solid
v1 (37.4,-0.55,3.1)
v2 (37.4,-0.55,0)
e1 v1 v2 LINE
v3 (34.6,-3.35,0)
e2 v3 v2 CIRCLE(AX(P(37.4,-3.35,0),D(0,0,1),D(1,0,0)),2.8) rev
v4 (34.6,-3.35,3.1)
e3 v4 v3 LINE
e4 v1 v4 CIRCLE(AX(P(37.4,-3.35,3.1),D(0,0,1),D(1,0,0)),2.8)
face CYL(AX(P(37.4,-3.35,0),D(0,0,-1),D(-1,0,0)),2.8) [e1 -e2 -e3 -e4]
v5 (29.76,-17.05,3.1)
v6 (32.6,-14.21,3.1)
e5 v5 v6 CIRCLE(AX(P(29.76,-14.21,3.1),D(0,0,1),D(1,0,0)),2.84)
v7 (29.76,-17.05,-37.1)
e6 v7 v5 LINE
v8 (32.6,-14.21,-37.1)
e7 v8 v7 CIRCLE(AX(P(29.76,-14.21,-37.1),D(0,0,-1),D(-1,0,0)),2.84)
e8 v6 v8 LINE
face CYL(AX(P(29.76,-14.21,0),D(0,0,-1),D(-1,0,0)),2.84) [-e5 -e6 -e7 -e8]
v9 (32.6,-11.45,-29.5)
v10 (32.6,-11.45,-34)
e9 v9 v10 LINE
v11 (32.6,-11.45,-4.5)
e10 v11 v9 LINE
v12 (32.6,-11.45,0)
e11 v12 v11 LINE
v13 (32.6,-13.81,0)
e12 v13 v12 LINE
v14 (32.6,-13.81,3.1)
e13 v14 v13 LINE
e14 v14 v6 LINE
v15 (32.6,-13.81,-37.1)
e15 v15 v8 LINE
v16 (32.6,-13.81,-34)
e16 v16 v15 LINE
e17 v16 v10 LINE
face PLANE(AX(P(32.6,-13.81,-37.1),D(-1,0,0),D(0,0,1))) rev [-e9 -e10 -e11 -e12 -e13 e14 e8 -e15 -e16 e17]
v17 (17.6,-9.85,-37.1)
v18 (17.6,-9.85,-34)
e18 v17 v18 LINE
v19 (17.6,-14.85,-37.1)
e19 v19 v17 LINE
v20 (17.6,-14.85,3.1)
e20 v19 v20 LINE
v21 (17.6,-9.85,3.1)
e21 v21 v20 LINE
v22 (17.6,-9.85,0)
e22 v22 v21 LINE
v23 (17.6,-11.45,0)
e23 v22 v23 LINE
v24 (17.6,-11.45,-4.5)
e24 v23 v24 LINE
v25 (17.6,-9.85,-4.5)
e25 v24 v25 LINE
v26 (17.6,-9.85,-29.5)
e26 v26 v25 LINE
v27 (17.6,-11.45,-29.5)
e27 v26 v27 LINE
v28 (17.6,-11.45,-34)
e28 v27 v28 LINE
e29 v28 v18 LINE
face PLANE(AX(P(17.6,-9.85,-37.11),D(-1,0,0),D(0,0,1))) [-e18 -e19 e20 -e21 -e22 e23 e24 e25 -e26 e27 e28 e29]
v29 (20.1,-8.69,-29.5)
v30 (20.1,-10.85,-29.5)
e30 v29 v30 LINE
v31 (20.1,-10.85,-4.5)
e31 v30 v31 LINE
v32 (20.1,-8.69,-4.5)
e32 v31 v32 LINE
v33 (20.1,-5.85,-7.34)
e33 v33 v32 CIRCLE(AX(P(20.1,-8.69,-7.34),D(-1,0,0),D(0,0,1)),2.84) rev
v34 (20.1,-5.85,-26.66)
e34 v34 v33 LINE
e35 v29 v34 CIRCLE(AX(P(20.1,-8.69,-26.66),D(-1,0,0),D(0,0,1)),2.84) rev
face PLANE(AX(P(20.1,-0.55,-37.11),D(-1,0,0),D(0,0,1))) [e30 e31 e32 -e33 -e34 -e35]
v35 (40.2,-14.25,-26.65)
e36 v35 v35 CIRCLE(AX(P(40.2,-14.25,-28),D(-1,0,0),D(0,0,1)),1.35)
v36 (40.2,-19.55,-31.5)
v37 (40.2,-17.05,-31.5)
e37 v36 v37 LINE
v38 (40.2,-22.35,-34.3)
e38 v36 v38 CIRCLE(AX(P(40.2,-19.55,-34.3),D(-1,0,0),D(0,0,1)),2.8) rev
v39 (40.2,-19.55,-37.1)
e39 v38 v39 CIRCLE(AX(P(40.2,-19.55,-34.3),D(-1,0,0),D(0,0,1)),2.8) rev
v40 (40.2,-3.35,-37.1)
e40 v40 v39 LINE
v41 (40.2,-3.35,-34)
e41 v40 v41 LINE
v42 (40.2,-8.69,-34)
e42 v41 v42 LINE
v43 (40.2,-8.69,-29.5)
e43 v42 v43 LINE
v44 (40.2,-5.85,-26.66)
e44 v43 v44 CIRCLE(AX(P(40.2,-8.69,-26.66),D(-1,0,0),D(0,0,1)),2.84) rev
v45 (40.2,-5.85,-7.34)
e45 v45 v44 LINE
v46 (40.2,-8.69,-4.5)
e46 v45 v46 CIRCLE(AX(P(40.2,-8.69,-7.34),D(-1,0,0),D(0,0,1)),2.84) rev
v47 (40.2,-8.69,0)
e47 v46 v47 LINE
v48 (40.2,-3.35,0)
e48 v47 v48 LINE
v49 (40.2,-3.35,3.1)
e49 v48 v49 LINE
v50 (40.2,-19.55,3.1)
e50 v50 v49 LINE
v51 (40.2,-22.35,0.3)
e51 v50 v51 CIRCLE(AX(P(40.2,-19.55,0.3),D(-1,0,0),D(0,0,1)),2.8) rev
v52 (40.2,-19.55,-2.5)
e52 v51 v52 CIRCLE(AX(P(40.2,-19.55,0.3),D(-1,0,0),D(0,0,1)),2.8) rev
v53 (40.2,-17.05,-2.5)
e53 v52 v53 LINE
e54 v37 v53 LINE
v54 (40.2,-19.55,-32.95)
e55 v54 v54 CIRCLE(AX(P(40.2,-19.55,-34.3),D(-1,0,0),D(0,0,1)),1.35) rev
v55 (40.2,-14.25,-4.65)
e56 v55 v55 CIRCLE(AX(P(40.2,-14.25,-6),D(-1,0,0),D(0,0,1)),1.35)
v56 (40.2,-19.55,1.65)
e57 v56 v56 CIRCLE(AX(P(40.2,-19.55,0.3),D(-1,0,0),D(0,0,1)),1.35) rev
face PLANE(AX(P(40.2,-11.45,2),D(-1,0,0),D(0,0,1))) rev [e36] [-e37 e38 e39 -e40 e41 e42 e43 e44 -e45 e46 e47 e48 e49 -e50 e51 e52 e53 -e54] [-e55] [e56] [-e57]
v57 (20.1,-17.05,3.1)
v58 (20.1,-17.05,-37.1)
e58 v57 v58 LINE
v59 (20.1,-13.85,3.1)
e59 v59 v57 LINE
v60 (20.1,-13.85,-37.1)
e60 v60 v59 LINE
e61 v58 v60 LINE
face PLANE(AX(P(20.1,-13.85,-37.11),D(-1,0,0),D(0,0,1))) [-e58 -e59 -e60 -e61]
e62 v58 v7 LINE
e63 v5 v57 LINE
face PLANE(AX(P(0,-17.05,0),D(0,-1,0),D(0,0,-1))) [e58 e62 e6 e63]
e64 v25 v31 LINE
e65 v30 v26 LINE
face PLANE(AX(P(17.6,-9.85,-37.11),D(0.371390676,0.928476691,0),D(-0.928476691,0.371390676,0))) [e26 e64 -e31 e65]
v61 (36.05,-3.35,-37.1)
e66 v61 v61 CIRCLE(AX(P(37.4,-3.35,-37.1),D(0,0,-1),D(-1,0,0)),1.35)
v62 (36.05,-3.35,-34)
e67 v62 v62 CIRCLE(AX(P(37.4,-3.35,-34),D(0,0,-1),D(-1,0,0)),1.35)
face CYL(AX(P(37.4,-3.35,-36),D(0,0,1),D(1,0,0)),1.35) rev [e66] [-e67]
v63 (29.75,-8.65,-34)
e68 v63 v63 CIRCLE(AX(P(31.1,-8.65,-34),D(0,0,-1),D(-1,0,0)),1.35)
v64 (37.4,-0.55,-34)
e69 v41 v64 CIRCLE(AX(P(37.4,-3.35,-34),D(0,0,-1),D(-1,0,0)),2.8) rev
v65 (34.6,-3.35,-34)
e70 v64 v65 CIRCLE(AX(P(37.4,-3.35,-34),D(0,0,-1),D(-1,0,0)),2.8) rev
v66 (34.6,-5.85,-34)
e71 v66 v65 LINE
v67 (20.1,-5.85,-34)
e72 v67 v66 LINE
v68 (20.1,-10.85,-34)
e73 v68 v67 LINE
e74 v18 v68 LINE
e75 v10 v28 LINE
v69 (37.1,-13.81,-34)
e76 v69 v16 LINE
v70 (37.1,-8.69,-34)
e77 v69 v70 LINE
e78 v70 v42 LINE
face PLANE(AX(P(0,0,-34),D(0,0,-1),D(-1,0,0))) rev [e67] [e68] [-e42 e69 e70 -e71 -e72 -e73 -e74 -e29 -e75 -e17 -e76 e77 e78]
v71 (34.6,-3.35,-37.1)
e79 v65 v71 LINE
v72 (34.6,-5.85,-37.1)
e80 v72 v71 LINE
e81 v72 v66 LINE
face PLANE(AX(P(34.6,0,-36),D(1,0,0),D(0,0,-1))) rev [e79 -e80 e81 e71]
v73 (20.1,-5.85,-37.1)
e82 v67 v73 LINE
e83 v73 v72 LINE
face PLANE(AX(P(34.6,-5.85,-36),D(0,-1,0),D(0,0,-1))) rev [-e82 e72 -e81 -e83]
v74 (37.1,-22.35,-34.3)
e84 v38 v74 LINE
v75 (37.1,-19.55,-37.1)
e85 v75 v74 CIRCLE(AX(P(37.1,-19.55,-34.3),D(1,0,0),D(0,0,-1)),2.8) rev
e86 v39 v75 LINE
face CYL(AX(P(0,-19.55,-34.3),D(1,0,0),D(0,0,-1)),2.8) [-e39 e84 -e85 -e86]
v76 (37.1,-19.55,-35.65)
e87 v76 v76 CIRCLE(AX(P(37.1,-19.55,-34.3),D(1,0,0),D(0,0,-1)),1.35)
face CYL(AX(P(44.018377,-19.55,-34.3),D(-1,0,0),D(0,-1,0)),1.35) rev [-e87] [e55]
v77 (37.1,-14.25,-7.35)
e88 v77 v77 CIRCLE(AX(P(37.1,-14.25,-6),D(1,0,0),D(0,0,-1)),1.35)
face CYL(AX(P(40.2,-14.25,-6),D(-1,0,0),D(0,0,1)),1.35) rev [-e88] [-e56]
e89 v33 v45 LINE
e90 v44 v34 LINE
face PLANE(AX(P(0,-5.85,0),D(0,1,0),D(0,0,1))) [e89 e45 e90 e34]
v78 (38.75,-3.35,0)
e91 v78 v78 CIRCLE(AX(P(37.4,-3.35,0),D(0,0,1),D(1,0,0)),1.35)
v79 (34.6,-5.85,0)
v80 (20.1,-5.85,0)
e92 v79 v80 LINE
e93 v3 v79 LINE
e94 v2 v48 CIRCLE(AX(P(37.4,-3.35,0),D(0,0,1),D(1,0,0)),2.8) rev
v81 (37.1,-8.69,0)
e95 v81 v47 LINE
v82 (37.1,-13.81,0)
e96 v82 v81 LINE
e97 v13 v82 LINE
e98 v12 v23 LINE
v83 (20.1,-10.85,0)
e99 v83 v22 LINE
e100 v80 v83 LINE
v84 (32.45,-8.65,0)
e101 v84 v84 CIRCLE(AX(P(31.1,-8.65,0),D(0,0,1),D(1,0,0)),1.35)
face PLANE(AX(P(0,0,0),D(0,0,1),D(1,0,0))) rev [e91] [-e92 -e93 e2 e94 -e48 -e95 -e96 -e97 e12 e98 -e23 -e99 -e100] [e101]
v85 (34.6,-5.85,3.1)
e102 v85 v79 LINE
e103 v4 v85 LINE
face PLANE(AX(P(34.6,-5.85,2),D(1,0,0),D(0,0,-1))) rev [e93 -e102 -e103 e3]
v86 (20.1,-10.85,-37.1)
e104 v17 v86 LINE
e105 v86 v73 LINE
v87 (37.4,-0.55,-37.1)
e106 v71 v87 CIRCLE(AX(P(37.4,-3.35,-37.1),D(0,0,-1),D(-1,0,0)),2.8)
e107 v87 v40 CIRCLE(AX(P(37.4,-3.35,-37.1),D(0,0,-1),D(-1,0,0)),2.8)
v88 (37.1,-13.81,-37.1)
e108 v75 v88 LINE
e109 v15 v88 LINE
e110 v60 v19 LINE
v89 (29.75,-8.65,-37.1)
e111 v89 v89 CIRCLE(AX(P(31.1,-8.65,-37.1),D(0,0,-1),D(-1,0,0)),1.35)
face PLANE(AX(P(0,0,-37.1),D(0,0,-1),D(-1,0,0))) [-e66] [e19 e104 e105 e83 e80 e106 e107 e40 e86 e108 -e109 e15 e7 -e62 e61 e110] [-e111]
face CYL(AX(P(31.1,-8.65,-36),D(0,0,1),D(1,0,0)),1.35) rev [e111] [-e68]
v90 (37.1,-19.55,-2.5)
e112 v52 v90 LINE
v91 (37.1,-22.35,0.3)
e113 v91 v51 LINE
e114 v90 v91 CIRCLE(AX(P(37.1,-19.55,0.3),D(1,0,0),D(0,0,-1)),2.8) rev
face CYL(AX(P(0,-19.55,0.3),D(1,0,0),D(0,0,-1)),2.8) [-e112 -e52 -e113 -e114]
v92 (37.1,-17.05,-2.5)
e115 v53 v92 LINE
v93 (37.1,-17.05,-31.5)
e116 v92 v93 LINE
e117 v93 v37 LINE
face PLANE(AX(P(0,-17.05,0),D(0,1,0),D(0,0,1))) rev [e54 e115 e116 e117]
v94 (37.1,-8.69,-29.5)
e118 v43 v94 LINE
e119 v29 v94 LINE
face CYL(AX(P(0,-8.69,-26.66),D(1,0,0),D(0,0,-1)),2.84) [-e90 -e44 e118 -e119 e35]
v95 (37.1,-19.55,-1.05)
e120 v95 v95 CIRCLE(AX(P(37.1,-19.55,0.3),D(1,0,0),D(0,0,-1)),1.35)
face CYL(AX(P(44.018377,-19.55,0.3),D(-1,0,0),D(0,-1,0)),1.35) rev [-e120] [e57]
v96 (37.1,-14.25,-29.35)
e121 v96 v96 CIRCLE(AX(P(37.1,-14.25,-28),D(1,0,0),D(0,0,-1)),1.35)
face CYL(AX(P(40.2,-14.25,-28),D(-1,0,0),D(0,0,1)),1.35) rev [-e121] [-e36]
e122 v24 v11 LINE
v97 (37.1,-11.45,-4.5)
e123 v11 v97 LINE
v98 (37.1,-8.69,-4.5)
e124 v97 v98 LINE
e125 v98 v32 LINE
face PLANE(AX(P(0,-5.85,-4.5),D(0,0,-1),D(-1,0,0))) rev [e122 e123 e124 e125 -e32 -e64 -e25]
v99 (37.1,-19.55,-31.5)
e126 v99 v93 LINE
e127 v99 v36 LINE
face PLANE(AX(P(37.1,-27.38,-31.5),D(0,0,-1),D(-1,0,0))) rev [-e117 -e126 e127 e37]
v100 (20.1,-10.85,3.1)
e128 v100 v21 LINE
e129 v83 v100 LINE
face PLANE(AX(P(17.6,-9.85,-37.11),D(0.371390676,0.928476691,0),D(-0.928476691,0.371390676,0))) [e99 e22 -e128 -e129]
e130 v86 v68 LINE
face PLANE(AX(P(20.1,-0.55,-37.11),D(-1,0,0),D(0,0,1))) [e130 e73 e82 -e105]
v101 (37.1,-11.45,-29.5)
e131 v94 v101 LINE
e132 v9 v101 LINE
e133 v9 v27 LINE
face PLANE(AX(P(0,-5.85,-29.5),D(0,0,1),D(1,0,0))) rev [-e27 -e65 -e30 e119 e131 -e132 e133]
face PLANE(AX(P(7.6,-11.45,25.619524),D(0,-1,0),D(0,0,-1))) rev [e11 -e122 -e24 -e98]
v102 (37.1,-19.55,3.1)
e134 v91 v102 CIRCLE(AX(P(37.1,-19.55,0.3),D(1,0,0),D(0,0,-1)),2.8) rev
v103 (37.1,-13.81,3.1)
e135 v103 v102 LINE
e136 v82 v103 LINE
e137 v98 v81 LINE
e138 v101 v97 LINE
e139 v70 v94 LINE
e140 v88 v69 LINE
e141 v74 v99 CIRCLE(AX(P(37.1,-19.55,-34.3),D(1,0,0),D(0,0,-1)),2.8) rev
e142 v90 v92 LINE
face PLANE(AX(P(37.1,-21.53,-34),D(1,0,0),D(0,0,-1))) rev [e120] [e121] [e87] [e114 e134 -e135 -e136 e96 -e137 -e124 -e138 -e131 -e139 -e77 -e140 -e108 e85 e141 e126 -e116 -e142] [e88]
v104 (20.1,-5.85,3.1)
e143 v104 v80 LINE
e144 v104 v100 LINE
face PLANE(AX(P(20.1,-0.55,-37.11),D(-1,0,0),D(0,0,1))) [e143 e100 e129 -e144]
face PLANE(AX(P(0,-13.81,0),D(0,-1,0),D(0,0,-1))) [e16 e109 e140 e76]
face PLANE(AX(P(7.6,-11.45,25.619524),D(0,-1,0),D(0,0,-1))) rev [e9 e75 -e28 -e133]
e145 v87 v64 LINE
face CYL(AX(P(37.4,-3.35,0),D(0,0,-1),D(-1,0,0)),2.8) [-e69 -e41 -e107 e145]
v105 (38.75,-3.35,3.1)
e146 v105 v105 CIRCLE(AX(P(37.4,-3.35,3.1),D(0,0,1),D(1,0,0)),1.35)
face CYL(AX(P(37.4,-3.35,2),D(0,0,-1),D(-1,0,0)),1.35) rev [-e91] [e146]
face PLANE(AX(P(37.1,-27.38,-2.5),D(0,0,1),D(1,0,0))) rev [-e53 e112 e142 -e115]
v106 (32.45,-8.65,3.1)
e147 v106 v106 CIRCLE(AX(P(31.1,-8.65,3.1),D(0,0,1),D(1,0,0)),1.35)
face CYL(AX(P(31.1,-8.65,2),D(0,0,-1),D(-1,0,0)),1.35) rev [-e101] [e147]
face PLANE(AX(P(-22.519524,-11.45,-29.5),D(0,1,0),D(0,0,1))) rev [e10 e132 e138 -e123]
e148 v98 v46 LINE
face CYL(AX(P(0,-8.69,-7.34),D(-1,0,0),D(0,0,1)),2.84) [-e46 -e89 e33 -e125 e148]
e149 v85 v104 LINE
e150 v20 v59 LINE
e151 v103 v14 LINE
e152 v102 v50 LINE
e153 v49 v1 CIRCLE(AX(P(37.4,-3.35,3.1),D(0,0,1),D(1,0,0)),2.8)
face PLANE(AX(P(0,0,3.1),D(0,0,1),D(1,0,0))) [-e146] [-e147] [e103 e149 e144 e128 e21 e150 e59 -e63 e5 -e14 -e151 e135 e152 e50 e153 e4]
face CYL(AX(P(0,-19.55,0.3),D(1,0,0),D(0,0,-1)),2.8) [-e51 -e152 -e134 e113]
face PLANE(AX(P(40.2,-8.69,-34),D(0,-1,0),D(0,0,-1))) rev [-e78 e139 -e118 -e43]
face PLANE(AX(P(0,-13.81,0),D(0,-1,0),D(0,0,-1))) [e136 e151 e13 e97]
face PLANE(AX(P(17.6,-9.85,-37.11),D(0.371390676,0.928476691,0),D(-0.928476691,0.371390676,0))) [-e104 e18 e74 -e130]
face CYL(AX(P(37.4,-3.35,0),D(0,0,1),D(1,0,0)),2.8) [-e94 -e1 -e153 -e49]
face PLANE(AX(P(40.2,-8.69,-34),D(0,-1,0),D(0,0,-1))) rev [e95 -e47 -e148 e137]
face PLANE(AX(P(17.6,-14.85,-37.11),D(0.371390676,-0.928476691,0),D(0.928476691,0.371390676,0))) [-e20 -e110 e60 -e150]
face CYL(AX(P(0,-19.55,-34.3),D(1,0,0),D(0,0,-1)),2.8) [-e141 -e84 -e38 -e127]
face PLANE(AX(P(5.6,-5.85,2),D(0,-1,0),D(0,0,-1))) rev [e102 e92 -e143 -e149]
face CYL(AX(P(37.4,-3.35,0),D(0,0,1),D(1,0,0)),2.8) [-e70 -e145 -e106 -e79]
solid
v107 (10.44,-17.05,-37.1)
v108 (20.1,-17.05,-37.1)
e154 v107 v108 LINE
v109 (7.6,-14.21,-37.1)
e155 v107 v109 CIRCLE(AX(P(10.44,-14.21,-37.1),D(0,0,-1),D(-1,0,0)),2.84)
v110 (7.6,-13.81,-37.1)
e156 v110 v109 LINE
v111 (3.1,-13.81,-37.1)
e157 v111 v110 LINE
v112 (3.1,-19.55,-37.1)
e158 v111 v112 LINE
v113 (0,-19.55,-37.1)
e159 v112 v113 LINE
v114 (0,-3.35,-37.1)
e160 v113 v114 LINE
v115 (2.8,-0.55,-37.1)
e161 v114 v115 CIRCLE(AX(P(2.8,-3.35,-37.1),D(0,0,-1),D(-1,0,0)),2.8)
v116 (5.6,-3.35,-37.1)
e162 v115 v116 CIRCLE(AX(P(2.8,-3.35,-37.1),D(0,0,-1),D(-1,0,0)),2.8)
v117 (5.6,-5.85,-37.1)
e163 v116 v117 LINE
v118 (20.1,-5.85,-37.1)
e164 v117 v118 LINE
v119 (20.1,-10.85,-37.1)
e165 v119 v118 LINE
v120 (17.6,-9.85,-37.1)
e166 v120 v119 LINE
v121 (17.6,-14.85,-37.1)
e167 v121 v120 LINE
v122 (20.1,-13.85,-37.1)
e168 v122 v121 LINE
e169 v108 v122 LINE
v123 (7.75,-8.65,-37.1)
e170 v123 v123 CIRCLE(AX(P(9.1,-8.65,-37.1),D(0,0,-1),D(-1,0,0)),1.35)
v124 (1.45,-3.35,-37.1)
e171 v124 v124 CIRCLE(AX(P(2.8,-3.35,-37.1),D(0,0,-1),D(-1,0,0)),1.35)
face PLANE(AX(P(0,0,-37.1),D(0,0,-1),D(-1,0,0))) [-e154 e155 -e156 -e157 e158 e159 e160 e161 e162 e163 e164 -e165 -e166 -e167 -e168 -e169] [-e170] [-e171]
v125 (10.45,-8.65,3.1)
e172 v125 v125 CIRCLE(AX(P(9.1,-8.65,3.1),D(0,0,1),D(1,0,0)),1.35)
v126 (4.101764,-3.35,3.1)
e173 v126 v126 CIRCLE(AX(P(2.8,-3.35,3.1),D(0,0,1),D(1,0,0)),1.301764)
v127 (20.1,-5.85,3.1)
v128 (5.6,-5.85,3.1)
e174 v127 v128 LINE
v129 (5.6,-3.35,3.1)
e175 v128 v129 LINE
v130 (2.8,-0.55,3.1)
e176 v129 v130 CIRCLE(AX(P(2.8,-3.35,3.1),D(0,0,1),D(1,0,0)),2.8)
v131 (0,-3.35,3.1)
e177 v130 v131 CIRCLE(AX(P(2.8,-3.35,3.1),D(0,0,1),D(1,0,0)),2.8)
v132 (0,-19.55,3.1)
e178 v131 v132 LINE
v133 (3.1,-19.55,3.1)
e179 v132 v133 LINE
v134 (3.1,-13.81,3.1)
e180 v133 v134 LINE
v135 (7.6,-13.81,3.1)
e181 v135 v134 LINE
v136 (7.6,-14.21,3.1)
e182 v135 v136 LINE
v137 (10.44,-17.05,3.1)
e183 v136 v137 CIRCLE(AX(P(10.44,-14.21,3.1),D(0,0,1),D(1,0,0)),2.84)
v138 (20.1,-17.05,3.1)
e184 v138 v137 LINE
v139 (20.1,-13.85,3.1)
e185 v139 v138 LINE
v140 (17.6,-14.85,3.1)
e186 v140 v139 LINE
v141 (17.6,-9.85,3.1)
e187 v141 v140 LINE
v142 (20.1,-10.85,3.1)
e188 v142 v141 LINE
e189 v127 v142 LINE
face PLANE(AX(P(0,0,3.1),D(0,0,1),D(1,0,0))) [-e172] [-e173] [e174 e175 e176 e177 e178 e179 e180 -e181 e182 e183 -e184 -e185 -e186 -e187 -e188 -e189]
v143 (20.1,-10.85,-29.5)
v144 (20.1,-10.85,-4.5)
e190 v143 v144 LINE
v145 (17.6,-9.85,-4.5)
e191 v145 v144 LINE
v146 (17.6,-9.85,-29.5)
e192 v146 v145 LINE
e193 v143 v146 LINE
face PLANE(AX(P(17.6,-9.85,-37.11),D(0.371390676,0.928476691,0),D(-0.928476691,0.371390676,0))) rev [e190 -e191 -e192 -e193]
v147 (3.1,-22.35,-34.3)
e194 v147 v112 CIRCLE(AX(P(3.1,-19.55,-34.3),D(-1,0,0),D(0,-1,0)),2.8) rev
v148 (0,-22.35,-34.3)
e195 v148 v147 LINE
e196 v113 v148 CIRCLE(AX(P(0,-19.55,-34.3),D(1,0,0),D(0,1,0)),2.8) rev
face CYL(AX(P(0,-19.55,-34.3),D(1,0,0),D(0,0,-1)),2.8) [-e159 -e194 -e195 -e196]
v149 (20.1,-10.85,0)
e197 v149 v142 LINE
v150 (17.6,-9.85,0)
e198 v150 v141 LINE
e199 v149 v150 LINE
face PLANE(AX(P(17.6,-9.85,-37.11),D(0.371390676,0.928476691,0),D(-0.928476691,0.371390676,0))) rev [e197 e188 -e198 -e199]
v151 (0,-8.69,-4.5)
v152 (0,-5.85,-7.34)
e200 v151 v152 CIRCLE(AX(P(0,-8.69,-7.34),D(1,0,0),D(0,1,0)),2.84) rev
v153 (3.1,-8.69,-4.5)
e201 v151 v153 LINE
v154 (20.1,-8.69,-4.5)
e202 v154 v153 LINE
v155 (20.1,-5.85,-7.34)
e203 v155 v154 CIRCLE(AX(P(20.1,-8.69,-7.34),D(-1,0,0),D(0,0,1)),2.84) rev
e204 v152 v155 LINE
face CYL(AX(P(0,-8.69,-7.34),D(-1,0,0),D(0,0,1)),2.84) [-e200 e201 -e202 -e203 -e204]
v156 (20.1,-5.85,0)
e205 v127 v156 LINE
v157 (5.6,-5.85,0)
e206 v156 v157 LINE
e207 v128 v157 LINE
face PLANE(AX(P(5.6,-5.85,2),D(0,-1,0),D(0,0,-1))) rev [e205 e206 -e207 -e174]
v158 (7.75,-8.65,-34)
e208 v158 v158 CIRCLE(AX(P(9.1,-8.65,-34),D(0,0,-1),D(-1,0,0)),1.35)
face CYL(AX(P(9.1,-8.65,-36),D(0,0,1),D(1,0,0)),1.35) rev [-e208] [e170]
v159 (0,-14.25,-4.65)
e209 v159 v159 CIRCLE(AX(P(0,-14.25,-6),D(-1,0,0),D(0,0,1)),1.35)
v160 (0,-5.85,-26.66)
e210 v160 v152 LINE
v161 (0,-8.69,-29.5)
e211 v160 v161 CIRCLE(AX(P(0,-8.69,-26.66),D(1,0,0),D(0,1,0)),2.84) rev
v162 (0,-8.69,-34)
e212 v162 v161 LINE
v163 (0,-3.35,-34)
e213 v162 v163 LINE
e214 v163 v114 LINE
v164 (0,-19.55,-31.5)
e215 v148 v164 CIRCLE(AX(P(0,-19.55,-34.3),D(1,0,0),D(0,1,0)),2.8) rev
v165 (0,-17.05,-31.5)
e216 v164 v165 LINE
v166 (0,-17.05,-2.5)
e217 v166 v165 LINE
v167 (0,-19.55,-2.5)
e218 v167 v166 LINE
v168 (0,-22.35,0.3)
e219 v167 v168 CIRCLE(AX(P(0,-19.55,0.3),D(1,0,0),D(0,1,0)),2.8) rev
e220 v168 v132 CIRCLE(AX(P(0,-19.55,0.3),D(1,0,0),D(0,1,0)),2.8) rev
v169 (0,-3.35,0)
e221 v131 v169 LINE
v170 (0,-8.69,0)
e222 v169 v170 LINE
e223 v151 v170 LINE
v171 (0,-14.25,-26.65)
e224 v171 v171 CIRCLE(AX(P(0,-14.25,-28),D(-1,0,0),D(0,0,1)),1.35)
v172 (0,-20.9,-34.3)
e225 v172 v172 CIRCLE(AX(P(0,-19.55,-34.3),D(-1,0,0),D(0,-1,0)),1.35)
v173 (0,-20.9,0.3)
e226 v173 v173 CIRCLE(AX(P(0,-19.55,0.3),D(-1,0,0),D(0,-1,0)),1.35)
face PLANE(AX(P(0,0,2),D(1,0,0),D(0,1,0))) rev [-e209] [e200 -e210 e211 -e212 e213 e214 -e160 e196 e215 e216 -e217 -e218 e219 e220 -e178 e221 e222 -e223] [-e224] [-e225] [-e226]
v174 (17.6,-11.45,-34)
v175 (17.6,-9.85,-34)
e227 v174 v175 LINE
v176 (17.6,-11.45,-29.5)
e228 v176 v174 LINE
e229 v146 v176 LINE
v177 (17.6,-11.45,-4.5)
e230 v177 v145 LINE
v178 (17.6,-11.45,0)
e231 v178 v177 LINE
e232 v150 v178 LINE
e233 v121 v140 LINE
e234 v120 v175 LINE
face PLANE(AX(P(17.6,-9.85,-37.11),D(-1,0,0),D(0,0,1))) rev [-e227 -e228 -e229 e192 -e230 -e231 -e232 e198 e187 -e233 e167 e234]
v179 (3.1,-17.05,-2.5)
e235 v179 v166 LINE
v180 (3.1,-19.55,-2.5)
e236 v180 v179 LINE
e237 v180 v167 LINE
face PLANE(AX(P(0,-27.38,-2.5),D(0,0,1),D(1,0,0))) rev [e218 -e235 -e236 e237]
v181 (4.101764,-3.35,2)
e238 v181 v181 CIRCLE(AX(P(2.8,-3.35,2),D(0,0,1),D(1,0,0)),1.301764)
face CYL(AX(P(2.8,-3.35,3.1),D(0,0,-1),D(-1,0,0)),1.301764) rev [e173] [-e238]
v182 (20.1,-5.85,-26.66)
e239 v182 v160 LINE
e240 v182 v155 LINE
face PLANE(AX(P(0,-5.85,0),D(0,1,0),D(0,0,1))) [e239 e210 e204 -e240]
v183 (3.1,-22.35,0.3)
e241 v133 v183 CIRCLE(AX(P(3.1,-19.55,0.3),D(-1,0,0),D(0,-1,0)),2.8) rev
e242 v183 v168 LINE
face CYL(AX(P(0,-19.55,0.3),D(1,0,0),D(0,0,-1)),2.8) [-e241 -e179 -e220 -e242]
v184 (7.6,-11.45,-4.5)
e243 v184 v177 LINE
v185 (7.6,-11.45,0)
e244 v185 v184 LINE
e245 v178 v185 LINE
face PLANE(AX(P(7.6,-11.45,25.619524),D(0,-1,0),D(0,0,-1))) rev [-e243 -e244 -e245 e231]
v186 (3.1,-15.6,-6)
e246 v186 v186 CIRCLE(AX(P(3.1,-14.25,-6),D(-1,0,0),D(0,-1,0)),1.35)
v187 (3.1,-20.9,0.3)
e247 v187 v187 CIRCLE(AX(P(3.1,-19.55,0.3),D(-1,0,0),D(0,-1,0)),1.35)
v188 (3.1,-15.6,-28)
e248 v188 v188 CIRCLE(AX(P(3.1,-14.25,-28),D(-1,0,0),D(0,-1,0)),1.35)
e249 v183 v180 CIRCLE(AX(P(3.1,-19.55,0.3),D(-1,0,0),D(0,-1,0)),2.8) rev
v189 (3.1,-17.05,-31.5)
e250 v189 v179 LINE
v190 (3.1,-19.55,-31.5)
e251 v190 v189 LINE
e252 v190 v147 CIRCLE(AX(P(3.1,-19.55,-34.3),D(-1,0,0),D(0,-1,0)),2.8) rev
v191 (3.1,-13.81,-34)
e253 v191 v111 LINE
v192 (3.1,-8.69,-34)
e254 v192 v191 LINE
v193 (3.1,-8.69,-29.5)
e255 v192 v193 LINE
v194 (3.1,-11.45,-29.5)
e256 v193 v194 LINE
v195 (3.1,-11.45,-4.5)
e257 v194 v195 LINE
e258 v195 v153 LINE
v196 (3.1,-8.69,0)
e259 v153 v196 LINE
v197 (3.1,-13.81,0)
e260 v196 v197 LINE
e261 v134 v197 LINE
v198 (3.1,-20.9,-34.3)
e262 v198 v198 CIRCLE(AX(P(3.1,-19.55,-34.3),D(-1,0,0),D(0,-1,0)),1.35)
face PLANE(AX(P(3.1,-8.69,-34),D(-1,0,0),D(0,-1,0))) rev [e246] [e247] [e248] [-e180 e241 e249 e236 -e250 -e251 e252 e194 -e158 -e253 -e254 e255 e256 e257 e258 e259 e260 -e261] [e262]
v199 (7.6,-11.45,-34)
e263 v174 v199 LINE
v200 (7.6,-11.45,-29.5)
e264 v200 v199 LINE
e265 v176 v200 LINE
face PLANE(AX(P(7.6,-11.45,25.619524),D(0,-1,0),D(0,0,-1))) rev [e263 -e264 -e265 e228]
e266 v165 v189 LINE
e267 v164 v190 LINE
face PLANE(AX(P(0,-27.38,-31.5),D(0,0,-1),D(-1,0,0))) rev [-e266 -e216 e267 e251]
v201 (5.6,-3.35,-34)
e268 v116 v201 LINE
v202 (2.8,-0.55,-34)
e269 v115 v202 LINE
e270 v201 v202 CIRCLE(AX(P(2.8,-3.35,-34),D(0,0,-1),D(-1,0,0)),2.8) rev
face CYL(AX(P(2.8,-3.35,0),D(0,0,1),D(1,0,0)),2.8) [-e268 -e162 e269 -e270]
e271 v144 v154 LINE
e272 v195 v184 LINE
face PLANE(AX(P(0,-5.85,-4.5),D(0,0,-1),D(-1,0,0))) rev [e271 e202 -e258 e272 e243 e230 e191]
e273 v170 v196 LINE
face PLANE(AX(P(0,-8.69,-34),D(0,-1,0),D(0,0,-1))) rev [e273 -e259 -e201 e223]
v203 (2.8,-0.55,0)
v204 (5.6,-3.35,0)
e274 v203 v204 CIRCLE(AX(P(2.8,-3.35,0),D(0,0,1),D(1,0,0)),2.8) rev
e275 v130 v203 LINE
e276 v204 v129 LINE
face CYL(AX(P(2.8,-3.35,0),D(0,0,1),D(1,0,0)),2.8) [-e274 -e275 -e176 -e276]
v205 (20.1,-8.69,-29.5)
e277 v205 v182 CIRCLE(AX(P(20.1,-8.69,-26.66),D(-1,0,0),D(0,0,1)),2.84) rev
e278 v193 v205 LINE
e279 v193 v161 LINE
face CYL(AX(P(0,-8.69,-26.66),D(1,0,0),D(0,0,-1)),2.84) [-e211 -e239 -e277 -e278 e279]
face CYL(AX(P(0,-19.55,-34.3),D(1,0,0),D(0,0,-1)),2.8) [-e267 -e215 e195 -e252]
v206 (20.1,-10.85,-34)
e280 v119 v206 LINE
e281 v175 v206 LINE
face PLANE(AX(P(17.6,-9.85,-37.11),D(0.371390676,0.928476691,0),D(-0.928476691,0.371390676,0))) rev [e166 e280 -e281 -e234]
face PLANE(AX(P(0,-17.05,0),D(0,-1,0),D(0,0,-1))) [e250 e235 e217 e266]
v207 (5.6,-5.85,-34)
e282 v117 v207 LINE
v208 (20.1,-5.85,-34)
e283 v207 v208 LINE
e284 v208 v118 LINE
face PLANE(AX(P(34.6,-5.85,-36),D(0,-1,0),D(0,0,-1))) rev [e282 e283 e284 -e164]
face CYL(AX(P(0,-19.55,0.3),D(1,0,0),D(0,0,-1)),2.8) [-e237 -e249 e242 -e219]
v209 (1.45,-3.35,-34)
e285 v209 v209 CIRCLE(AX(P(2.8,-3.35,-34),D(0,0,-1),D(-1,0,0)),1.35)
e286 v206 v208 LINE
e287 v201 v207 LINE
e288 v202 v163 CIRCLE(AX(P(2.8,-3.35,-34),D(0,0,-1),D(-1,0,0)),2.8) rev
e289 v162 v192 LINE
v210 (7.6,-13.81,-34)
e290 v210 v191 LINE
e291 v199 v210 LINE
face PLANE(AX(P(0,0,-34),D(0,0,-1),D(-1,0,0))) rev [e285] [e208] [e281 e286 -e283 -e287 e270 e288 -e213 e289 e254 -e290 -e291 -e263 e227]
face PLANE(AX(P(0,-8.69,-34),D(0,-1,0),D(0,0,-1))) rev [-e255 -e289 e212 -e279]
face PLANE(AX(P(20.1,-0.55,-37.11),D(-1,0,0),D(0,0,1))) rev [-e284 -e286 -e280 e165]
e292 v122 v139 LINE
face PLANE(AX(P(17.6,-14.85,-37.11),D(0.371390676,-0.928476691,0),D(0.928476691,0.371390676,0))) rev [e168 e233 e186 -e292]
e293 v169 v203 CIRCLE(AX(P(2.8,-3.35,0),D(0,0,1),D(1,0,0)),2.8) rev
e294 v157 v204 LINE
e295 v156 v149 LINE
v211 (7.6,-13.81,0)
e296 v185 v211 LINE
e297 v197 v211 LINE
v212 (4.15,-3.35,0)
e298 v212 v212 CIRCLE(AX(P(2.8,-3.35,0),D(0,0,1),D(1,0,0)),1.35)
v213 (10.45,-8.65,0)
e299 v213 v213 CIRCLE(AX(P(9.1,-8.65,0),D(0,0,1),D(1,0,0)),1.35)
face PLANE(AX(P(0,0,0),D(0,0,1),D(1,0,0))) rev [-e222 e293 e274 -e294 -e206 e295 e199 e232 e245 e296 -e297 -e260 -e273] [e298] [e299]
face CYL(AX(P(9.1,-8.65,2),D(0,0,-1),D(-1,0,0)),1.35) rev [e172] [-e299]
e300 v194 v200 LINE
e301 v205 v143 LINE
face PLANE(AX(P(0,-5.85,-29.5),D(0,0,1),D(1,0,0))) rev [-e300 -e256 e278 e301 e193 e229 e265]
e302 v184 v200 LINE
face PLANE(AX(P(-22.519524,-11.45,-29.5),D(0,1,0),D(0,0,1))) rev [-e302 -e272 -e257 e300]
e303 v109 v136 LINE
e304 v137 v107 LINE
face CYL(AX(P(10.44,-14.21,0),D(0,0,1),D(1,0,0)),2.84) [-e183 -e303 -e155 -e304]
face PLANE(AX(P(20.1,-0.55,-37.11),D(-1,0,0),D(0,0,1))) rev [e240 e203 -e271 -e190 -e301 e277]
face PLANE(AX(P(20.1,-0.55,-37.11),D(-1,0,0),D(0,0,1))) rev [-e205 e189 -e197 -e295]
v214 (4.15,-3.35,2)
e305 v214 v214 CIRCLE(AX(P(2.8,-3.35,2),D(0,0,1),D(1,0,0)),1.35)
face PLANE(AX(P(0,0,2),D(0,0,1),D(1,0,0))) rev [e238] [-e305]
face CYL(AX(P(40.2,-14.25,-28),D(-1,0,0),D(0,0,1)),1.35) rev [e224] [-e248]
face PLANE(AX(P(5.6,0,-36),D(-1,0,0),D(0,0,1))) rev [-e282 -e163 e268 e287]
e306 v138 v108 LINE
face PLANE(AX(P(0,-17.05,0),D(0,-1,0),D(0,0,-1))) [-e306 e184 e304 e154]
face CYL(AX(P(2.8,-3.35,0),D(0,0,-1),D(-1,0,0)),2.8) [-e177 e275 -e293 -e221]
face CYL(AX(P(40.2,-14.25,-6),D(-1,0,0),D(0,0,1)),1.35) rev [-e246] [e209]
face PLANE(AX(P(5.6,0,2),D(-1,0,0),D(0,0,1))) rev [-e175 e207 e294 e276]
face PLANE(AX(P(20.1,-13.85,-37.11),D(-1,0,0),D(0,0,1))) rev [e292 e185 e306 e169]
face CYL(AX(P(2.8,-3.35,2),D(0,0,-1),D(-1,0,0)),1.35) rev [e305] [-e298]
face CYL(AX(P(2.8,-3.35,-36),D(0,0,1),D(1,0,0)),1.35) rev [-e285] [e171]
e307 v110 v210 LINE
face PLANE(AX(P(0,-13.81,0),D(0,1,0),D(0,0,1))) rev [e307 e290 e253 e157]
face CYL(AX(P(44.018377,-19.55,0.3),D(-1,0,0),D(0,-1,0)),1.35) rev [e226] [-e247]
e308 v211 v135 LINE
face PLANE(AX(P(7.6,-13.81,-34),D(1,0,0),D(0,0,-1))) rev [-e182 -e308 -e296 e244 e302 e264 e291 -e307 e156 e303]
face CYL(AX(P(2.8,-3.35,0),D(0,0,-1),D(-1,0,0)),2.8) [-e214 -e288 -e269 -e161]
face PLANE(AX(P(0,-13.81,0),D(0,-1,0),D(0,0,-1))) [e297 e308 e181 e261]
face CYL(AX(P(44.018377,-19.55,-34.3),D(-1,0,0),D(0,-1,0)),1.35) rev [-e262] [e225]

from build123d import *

# Parameters (mm, degrees)
ESBO_O1_R                  = 1.35
RESSALTO_EXTRUS_O1_DEPTH   = 2
ESBO_O3_W                  = 40.2
ESBO_O3_H                  = 2
RESSALTO_EXTRUS_O2_DEPTH   = 10.08
ESBO_O4_W                  = 3.1
ESBO_O4_H                  = 12.84
RESSALTO_EXTRUS_O3_DEPTH   = 34
CORTE_EXTRUS_O1_DEPTH      = 55.735280213
CORTE_EXTRUS_O1_DEPTH_BACK = 55.735280213
ESBO_O5_R                  = 1.35
ESBO_O7_W                  = 37.1
ESBO_O7_H                  = 3.24
CORTE_EXTRUS_O2_DEPTH      = 2
RESSALTO_EXTRUS_O5_START   = 2
ESBO_O12_R                 = 1.35
RESSALTO_EXTRUS_O5_DEPTH   = 2
ESBO_O18_W                 = 3.1
ESBO_O18_H                 = 3.24
RESSALTO_EXTRUS_O6_DEPTH   = 2
ESBO_O19_W                 = 3.1
ESBO_O19_H                 = 3.24
RESSALTO_EXTRUS_O7_DEPTH   = 2
ESBO_O21_R                 = 1.301764144
ESBO_O21_R_2               = 1.35
RESSALTO_EXTRUS_O8_DEPTH   = 1.1
RESSALTO_EXTRUS_O9_START   = 1.1
ESBO_O22_R                 = 1.35
RESSALTO_EXTRUS_O9_DEPTH   = 1.1
ESBO_O23_W                 = 3.1
ESBO_O23_H                 = 5.6
RESSALTO_EXTRUS_O10_DEPTH  = 5.85
CORTE_EXTRUS_O3_REACH      = 63.173
ESBO_O24_R                 = 1.35
ESBO_O25_W                 = 4.5
ESBO_O25_H                 = 3.1
CORTE_EXTRUS_O6_DEPTH      = 4.48
ESBO_O27_W                 = 3.1
ESBO_O27_H                 = 29
CORTE_EXTRUS_O7_DEPTH      = 4.48
ESBO_O28_W                 = 25
ESBO_O28_H                 = 40.2
CORTE_EXTRUS_O8_DEPTH      = 1.24
ESBO_O29_W                 = 25
ESBO_O29_H                 = 5.6
RESSALTO_EXTRUS_O11_DEPTH  = 34
ESBO_O31_W                 = 3.1
ESBO_O31_H                 = 25
RESSALTO_EXTRUS_O12_DEPTH  = 2.84
ESBO_O32_W                 = 25
ESBO_O32_H                 = 5.6
RESSALTO_EXTRUS_O13_DEPTH  = 34
FILETE1_R                  = 2.84
ESBO_O33_W                 = 5.6
ESBO_O33_H                 = 3.1
CORTE_EXTRUS_O9_DEPTH      = 0.55
ESBO_O35_W                 = 3.1
ESBO_O35_H                 = 5.6
CORTE_EXTRUS_O10_DEPTH     = 5.03
FILETE2_R                  = 2.8
DIVIDIR1_SURFACE_1_BACK    = 61.888
DIVIDIR1_SURFACE_1_DEPTH   = 123.776
DIVIDIR1_SURFACE_2_BACK    = 61.888
DIVIDIR1_SURFACE_2_DEPTH   = 123.776


with BuildPart() as part:
    # Esboço1 → Ressalto-extrusão1 (new body)
    with BuildSketch(Plane.XY):
        Polygon((0, 0), (5.6, 0), (5.6, -5.85), (34.6, -5.85), (34.6, 0), (40.2, 0), (40.2, -11.45), (0, -11.45), align=None)
        with Locations((2.8, -3.35)):
            Circle(ESBO_O1_R, mode=Mode.SUBTRACT)
        with Locations((37.4, -3.35)):
            Circle(ESBO_O1_R, mode=Mode.SUBTRACT)
        with Locations((31.1, -8.65)):
            Circle(ESBO_O1_R, mode=Mode.SUBTRACT)
        with Locations((9.1, -8.65)):
            Circle(ESBO_O1_R, mode=Mode.SUBTRACT)
    extrude(amount=RESSALTO_EXTRUS_O1_DEPTH)

    # Esboço3 → Ressalto-extrusão2 (add)
    with BuildSketch(Plane.XZ.offset(11.45)):
        with Locations((20.1, 1)):
            Rectangle(ESBO_O3_W, ESBO_O3_H)
    extrude(amount=RESSALTO_EXTRUS_O2_DEPTH)

    # Esboço4 → Ressalto-extrusão3 (add)
    with BuildSketch(Plane(origin=(0, 0, 0), x_dir=(-1, 0, 0), z_dir=(0, 0, -1))):
        with Locations((-38.65, -15.11)):
            Rectangle(ESBO_O4_W, ESBO_O4_H)
        with Locations((-1.55, -15.11)):
            Rectangle(ESBO_O4_W, ESBO_O4_H)
    extrude(amount=RESSALTO_EXTRUS_O3_DEPTH)

    # Esboço5 → Corte-extrusão1 (cut, two sides: drawn at the far end of the back side and taken through both)
    with BuildSketch(Plane.ZY.offset(-37.1).offset(-CORTE_EXTRUS_O1_DEPTH_BACK)):
        with Locations((-6, -14.25)):
            Circle(ESBO_O5_R)
        with Locations((-28, -14.25)):
            Circle(ESBO_O5_R)
    extrude(amount=CORTE_EXTRUS_O1_DEPTH + CORTE_EXTRUS_O1_DEPTH_BACK, mode=Mode.SUBTRACT)

    # Esboço7 → Corte-extrusão2 (cut)
    with BuildSketch(Plane(origin=(0, 0, 0), x_dir=(-1, 0, 0), z_dir=(0, 0, -1))):
        with Locations((-18.55, -19.91)):
            Rectangle(ESBO_O7_W, ESBO_O7_H)
    extrude(amount=-CORTE_EXTRUS_O2_DEPTH, mode=Mode.SUBTRACT)

    # Esboço12 → Ressalto-extrusão5 (add)
    with BuildSketch(Plane(origin=(0, 0, -34), x_dir=(-1, 0, 0), z_dir=(0, 0, -1)).offset(RESSALTO_EXTRUS_O5_START)):
        Polygon((-5.6, 0), (0, 0), (0, -18.29), (-40.2, -18.29), (-40.2, 0), (-34.6, 0), (-34.6, -5.85), (-5.6, -5.85), align=None)
        with Locations(Location((-31.1, -8.65, 0), (0, 0, 180))):
            Circle(ESBO_O12_R, mode=Mode.SUBTRACT)
        with Locations(Location((-9.1, -8.65, 0), (0, 0, 180))):
            Circle(ESBO_O12_R, mode=Mode.SUBTRACT)
        with Locations(Location((-2.8, -3.35, 0), (0, 0, 180))):
            Circle(ESBO_O12_R, mode=Mode.SUBTRACT)
        with Locations(Location((-37.4, -3.35, 0), (0, 0, 180))):
            Circle(ESBO_O12_R, mode=Mode.SUBTRACT)
    extrude(amount=-RESSALTO_EXTRUS_O5_DEPTH)

    # Esboço18 → Ressalto-extrusão6 (add)
    with BuildSketch(Plane.XY):
        with Locations((1.55, -19.91)):
            Rectangle(ESBO_O18_W, ESBO_O18_H)
    extrude(amount=RESSALTO_EXTRUS_O6_DEPTH)

    # Esboço19 → Ressalto-extrusão7 (add)
    with BuildSketch(Plane(origin=(0, 0, -34), x_dir=(-1, 0, 0), z_dir=(0, 0, -1))):
        with Locations((-1.55, -19.91)):
            Rectangle(ESBO_O19_W, ESBO_O19_H)
        with Locations((-38.65, -19.91)):
            Rectangle(ESBO_O19_W, ESBO_O19_H)
    extrude(amount=RESSALTO_EXTRUS_O7_DEPTH)

    # Esboço21 → Ressalto-extrusão8 (add)
    with BuildSketch(Plane.XY.offset(2)):
        Polygon((37.1, -21.53), (40.2, -21.53), (40.2, 0), (34.6, 0), (34.6, -5.85), (5.6, -5.85), (5.6, 0), (0, 0), (0, -21.53), (3.1, -21.53), (3.1, -18.29), (37.1, -18.29), align=None)
        with Locations((2.8, -3.35)):
            Circle(ESBO_O21_R, mode=Mode.SUBTRACT)
        with Locations((9.1, -8.65)):
            Circle(ESBO_O21_R_2, mode=Mode.SUBTRACT)
        with Locations((31.1, -8.65)):
            Circle(ESBO_O21_R_2, mode=Mode.SUBTRACT)
        with Locations((37.4, -3.35)):
            Circle(ESBO_O21_R_2, mode=Mode.SUBTRACT)
    extrude(amount=RESSALTO_EXTRUS_O8_DEPTH)

    # Esboço22 → Ressalto-extrusão9 (add)
    with BuildSketch(Plane(origin=(0, 0, -36), x_dir=(-1, 0, 0), z_dir=(0, 0, -1)).offset(RESSALTO_EXTRUS_O9_START)):
        Polygon((-5.6, 0), (0, 0), (0, -21.53), (-3.1, -21.53), (-3.1, -18.29), (-37.1, -18.29), (-37.1, -21.53), (-40.2, -21.53), (-40.2, 0), (-34.6, 0), (-34.6, -5.85), (-5.6, -5.85), align=None)
        with Locations(Location((-37.4, -3.35, 0), (0, 0, 180))):
            Circle(ESBO_O22_R, mode=Mode.SUBTRACT)
        with Locations(Location((-31.1, -8.65, 0), (0, 0, 180))):
            Circle(ESBO_O22_R, mode=Mode.SUBTRACT)
        with Locations(Location((-9.1, -8.65, 0), (0, 0, 180))):
            Circle(ESBO_O22_R, mode=Mode.SUBTRACT)
        with Locations(Location((-2.8, -3.35, 0), (0, 0, 180))):
            Circle(ESBO_O22_R, mode=Mode.SUBTRACT)
    extrude(amount=-RESSALTO_EXTRUS_O9_DEPTH)

    # Esboço23 → Ressalto-extrusão10 (add)
    with BuildSketch(Plane.XZ.offset(21.53)):
        with Locations((1.55, 0.3)):
            Rectangle(ESBO_O23_W, ESBO_O23_H)
        with Locations((1.55, -34.3)):
            Rectangle(ESBO_O23_W, ESBO_O23_H)
        with Locations((38.65, -34.3)):
            Rectangle(ESBO_O23_W, ESBO_O23_H)
        with Locations((38.65, 0.3)):
            Rectangle(ESBO_O23_W, ESBO_O23_H)
    extrude(amount=RESSALTO_EXTRUS_O10_DEPTH)

    # Corte-extrusão3: up to this face of the body (flat: up to its plane)
    corte_extrus_o3_end = Plane(part.part.faces().sort_by_distance((40.2, -15.177512698, -17))[0])
    # Esboço24 → Corte-extrusão3 (cut, up to the picked face)
    with BuildSketch(Plane.ZY, mode=Mode.PRIVATE) as corte_extrus_o3_sk1:
        with Locations(Location((-34.3, -19.55, 0), (0, 0, 270))):
            Circle(ESBO_O24_R)
    corte_extrus_o3_tool1 = split(extrude(corte_extrus_o3_sk1.sketch, amount=-CORTE_EXTRUS_O3_REACH, mode=Mode.PRIVATE), bisect_by=corte_extrus_o3_end, keep=Keep.BOTH, mode=Mode.PRIVATE)
    # Esboço24 → Corte-extrusão3 (cut, up to the picked face)
    with BuildSketch(Plane.ZY, mode=Mode.PRIVATE) as corte_extrus_o3_sk2:
        with Locations(Location((0.3, -19.55, 0), (0, 0, 270))):
            Circle(ESBO_O24_R)
    corte_extrus_o3_tool2 = split(extrude(corte_extrus_o3_sk2.sketch, amount=-CORTE_EXTRUS_O3_REACH, mode=Mode.PRIVATE), bisect_by=corte_extrus_o3_end, keep=Keep.BOTH, mode=Mode.PRIVATE)
    add(corte_extrus_o3_tool1.solids().sort_by(Axis((0, -19.55, -34.3), (1, 0, 0)))[0], mode=Mode.SUBTRACT)
    add(corte_extrus_o3_tool2.solids().sort_by(Axis((0, -19.55, 0.3), (1, 0, 0)))[0], mode=Mode.SUBTRACT)

    # Esboço25 → Corte-extrusão6 (cut)
    with BuildSketch(Plane.XZ.offset(18.29)):
        with Locations((5.35, -35.55)):
            Rectangle(ESBO_O25_W, ESBO_O25_H)
        with Locations((34.85, -35.55)):
            Rectangle(ESBO_O25_W, ESBO_O25_H)
        with Locations((34.85, 1.55)):
            Rectangle(ESBO_O25_W, ESBO_O25_H)
        with Locations((5.35, 1.55)):
            Rectangle(ESBO_O25_W, ESBO_O25_H)
    extrude(amount=-CORTE_EXTRUS_O6_DEPTH, mode=Mode.SUBTRACT)

    # Esboço27 → Corte-extrusão7 (cut)
    with BuildSketch(Plane.XZ.offset(21.53)):
        with Locations((1.55, -17)):
            Rectangle(ESBO_O27_W, ESBO_O27_H)
        with Locations((38.65, -17)):
            Rectangle(ESBO_O27_W, ESBO_O27_H)
    extrude(amount=-CORTE_EXTRUS_O7_DEPTH, mode=Mode.SUBTRACT)

    # Esboço28 → Corte-extrusão8 (cut)
    with BuildSketch(Plane.XZ.offset(18.29)):
        with Locations((20.1, -17)):
            Rectangle(ESBO_O28_W, ESBO_O28_H)
    extrude(amount=-CORTE_EXTRUS_O8_DEPTH, mode=Mode.SUBTRACT)

    # Esboço29 → Ressalto-extrusão11 (add)
    with BuildSketch(Plane.XY.offset(-34)):
        with Locations((20.1, -14.25)):
            Rectangle(ESBO_O29_W, ESBO_O29_H)
    extrude(amount=RESSALTO_EXTRUS_O11_DEPTH)

    # Esboço31 → Ressalto-extrusão12 (add)
    with BuildSketch(Plane(origin=(0, -8.69, 0), x_dir=(1, 0, 0), z_dir=(0, 1, 0))):
        with Locations((1.55, 17)):
            Rectangle(ESBO_O31_W, ESBO_O31_H)
        with Locations((38.65, 17)):
            Rectangle(ESBO_O31_W, ESBO_O31_H)
    extrude(amount=RESSALTO_EXTRUS_O12_DEPTH)

    # Esboço32 → Ressalto-extrusão13 (add)
    with BuildSketch(Plane.ZY.offset(-37.1)):
        with Locations((-17, -8.65)):
            Rectangle(ESBO_O32_W, ESBO_O32_H)
    extrude(amount=RESSALTO_EXTRUS_O13_DEPTH)

    # Filete1
    filete1_edges = [part.edges().sort_by_distance(p)[0] for p in [
        (32.6, -17.05, -17),
        (7.6, -17.05, -17),
        (20.1, -5.85, -29.5),
        (20.1, -5.85, -4.5),
    ]]
    fillet(filete1_edges, radius=FILETE1_R)

    # Esboço33 → Corte-extrusão9 (cut)
    with BuildSketch(Plane(origin=(0, 0, 0), x_dir=(1, 0, 0), z_dir=(0, 1, 0))):
        with Locations((2.8, 35.55)):
            Rectangle(ESBO_O33_W, ESBO_O33_H)
        with Locations((37.4, 35.55)):
            Rectangle(ESBO_O33_W, ESBO_O33_H)
        with Locations((37.4, -1.55)):
            Rectangle(ESBO_O33_W, ESBO_O33_H)
        with Locations((2.8, -1.55)):
            Rectangle(ESBO_O33_W, ESBO_O33_H)
    extrude(amount=-CORTE_EXTRUS_O9_DEPTH, mode=Mode.SUBTRACT)

    # Esboço35 → Corte-extrusão10 (cut)
    with BuildSketch(Plane.XZ.offset(27.38)):
        with Locations((1.55, 0.3)):
            Rectangle(ESBO_O35_W, ESBO_O35_H)
        with Locations((38.65, 0.3)):
            Rectangle(ESBO_O35_W, ESBO_O35_H)
        with Locations((38.65, -34.3)):
            Rectangle(ESBO_O35_W, ESBO_O35_H)
        with Locations((1.55, -34.3)):
            Rectangle(ESBO_O35_W, ESBO_O35_H)
    extrude(amount=-CORTE_EXTRUS_O10_DEPTH, mode=Mode.SUBTRACT)

    # Filete2
    filete2_edges = [part.edges().sort_by_distance(p)[0] for p in [
        (34.6, -0.55, 1.55),
        (40.2, -0.55, 1.55),
        (0, -0.55, 1.55),
        (5.6, -0.55, 1.55),
        (40.2, -0.55, -35.55),
        (34.6, -0.55, -35.55),
        (5.6, -0.55, -35.55),
        (0, -0.55, -35.55),
        (1.55, -22.35, -31.5),
        (1.55, -22.35, -37.1),
        (38.65, -22.35, -31.5),
        (38.65, -22.35, -37.1),
        (38.65, -22.35, 3.1),
        (38.65, -22.35, -2.5),
        (1.55, -22.35, -2.5),
        (1.55, -22.35, 3.1),
    ]]
    fillet(filete2_edges, radius=FILETE2_R - 0.0001)  # a hair under: the kernel refuses the full size


with BuildPart() as body_2:
    # Dividir1: the piece behind the surface
    add(part.part)
    # Dividir1 surface: a surface, the sketch's curves swept straight by 123.776 mm
    with BuildLine(Plane.XY.offset(3.1).offset(-DIVIDIR1_SURFACE_1_BACK), mode=Mode.PRIVATE) as dividir1_surface_1_path:
        Line((20.1, -0.55), (20.1, -10.85))
        Line((20.1, -10.85), (17.6, -9.85))
        Line((17.6, -9.85), (17.6, -14.85))
        Line((17.6, -14.85), (20.1, -13.85))
        Line((20.1, -13.85), (20.1, -22.35))
    dividir1_surface_1 = Shell.extrude(dividir1_surface_1_path.wire(), (0 * DIVIDIR1_SURFACE_1_DEPTH, 0 * DIVIDIR1_SURFACE_1_DEPTH, 1 * DIVIDIR1_SURFACE_1_DEPTH))
    split(bisect_by=dividir1_surface_1, keep=Keep.BOTTOM)


with BuildPart() as part_1:
    add(part.part)

    # Dividir1: split by a surface, the side it looks to stays
    # Dividir1 surface: a surface, the sketch's curves swept straight by 123.776 mm
    with BuildLine(Plane.XY.offset(3.1).offset(-DIVIDIR1_SURFACE_2_BACK), mode=Mode.PRIVATE) as dividir1_surface_2_path:
        Line((20.1, -0.55), (20.1, -10.85))
        Line((20.1, -10.85), (17.6, -9.85))
        Line((17.6, -9.85), (17.6, -14.85))
        Line((17.6, -14.85), (20.1, -13.85))
        Line((20.1, -13.85), (20.1, -22.35))
    dividir1_surface_2 = Shell.extrude(dividir1_surface_2_path.wire(), (0 * DIVIDIR1_SURFACE_2_DEPTH, 0 * DIVIDIR1_SURFACE_2_DEPTH, 1 * DIVIDIR1_SURFACE_2_DEPTH))
    split(bisect_by=dividir1_surface_2, keep=Keep.TOP)


solid = Compound([body_2.part, part_1.part])
